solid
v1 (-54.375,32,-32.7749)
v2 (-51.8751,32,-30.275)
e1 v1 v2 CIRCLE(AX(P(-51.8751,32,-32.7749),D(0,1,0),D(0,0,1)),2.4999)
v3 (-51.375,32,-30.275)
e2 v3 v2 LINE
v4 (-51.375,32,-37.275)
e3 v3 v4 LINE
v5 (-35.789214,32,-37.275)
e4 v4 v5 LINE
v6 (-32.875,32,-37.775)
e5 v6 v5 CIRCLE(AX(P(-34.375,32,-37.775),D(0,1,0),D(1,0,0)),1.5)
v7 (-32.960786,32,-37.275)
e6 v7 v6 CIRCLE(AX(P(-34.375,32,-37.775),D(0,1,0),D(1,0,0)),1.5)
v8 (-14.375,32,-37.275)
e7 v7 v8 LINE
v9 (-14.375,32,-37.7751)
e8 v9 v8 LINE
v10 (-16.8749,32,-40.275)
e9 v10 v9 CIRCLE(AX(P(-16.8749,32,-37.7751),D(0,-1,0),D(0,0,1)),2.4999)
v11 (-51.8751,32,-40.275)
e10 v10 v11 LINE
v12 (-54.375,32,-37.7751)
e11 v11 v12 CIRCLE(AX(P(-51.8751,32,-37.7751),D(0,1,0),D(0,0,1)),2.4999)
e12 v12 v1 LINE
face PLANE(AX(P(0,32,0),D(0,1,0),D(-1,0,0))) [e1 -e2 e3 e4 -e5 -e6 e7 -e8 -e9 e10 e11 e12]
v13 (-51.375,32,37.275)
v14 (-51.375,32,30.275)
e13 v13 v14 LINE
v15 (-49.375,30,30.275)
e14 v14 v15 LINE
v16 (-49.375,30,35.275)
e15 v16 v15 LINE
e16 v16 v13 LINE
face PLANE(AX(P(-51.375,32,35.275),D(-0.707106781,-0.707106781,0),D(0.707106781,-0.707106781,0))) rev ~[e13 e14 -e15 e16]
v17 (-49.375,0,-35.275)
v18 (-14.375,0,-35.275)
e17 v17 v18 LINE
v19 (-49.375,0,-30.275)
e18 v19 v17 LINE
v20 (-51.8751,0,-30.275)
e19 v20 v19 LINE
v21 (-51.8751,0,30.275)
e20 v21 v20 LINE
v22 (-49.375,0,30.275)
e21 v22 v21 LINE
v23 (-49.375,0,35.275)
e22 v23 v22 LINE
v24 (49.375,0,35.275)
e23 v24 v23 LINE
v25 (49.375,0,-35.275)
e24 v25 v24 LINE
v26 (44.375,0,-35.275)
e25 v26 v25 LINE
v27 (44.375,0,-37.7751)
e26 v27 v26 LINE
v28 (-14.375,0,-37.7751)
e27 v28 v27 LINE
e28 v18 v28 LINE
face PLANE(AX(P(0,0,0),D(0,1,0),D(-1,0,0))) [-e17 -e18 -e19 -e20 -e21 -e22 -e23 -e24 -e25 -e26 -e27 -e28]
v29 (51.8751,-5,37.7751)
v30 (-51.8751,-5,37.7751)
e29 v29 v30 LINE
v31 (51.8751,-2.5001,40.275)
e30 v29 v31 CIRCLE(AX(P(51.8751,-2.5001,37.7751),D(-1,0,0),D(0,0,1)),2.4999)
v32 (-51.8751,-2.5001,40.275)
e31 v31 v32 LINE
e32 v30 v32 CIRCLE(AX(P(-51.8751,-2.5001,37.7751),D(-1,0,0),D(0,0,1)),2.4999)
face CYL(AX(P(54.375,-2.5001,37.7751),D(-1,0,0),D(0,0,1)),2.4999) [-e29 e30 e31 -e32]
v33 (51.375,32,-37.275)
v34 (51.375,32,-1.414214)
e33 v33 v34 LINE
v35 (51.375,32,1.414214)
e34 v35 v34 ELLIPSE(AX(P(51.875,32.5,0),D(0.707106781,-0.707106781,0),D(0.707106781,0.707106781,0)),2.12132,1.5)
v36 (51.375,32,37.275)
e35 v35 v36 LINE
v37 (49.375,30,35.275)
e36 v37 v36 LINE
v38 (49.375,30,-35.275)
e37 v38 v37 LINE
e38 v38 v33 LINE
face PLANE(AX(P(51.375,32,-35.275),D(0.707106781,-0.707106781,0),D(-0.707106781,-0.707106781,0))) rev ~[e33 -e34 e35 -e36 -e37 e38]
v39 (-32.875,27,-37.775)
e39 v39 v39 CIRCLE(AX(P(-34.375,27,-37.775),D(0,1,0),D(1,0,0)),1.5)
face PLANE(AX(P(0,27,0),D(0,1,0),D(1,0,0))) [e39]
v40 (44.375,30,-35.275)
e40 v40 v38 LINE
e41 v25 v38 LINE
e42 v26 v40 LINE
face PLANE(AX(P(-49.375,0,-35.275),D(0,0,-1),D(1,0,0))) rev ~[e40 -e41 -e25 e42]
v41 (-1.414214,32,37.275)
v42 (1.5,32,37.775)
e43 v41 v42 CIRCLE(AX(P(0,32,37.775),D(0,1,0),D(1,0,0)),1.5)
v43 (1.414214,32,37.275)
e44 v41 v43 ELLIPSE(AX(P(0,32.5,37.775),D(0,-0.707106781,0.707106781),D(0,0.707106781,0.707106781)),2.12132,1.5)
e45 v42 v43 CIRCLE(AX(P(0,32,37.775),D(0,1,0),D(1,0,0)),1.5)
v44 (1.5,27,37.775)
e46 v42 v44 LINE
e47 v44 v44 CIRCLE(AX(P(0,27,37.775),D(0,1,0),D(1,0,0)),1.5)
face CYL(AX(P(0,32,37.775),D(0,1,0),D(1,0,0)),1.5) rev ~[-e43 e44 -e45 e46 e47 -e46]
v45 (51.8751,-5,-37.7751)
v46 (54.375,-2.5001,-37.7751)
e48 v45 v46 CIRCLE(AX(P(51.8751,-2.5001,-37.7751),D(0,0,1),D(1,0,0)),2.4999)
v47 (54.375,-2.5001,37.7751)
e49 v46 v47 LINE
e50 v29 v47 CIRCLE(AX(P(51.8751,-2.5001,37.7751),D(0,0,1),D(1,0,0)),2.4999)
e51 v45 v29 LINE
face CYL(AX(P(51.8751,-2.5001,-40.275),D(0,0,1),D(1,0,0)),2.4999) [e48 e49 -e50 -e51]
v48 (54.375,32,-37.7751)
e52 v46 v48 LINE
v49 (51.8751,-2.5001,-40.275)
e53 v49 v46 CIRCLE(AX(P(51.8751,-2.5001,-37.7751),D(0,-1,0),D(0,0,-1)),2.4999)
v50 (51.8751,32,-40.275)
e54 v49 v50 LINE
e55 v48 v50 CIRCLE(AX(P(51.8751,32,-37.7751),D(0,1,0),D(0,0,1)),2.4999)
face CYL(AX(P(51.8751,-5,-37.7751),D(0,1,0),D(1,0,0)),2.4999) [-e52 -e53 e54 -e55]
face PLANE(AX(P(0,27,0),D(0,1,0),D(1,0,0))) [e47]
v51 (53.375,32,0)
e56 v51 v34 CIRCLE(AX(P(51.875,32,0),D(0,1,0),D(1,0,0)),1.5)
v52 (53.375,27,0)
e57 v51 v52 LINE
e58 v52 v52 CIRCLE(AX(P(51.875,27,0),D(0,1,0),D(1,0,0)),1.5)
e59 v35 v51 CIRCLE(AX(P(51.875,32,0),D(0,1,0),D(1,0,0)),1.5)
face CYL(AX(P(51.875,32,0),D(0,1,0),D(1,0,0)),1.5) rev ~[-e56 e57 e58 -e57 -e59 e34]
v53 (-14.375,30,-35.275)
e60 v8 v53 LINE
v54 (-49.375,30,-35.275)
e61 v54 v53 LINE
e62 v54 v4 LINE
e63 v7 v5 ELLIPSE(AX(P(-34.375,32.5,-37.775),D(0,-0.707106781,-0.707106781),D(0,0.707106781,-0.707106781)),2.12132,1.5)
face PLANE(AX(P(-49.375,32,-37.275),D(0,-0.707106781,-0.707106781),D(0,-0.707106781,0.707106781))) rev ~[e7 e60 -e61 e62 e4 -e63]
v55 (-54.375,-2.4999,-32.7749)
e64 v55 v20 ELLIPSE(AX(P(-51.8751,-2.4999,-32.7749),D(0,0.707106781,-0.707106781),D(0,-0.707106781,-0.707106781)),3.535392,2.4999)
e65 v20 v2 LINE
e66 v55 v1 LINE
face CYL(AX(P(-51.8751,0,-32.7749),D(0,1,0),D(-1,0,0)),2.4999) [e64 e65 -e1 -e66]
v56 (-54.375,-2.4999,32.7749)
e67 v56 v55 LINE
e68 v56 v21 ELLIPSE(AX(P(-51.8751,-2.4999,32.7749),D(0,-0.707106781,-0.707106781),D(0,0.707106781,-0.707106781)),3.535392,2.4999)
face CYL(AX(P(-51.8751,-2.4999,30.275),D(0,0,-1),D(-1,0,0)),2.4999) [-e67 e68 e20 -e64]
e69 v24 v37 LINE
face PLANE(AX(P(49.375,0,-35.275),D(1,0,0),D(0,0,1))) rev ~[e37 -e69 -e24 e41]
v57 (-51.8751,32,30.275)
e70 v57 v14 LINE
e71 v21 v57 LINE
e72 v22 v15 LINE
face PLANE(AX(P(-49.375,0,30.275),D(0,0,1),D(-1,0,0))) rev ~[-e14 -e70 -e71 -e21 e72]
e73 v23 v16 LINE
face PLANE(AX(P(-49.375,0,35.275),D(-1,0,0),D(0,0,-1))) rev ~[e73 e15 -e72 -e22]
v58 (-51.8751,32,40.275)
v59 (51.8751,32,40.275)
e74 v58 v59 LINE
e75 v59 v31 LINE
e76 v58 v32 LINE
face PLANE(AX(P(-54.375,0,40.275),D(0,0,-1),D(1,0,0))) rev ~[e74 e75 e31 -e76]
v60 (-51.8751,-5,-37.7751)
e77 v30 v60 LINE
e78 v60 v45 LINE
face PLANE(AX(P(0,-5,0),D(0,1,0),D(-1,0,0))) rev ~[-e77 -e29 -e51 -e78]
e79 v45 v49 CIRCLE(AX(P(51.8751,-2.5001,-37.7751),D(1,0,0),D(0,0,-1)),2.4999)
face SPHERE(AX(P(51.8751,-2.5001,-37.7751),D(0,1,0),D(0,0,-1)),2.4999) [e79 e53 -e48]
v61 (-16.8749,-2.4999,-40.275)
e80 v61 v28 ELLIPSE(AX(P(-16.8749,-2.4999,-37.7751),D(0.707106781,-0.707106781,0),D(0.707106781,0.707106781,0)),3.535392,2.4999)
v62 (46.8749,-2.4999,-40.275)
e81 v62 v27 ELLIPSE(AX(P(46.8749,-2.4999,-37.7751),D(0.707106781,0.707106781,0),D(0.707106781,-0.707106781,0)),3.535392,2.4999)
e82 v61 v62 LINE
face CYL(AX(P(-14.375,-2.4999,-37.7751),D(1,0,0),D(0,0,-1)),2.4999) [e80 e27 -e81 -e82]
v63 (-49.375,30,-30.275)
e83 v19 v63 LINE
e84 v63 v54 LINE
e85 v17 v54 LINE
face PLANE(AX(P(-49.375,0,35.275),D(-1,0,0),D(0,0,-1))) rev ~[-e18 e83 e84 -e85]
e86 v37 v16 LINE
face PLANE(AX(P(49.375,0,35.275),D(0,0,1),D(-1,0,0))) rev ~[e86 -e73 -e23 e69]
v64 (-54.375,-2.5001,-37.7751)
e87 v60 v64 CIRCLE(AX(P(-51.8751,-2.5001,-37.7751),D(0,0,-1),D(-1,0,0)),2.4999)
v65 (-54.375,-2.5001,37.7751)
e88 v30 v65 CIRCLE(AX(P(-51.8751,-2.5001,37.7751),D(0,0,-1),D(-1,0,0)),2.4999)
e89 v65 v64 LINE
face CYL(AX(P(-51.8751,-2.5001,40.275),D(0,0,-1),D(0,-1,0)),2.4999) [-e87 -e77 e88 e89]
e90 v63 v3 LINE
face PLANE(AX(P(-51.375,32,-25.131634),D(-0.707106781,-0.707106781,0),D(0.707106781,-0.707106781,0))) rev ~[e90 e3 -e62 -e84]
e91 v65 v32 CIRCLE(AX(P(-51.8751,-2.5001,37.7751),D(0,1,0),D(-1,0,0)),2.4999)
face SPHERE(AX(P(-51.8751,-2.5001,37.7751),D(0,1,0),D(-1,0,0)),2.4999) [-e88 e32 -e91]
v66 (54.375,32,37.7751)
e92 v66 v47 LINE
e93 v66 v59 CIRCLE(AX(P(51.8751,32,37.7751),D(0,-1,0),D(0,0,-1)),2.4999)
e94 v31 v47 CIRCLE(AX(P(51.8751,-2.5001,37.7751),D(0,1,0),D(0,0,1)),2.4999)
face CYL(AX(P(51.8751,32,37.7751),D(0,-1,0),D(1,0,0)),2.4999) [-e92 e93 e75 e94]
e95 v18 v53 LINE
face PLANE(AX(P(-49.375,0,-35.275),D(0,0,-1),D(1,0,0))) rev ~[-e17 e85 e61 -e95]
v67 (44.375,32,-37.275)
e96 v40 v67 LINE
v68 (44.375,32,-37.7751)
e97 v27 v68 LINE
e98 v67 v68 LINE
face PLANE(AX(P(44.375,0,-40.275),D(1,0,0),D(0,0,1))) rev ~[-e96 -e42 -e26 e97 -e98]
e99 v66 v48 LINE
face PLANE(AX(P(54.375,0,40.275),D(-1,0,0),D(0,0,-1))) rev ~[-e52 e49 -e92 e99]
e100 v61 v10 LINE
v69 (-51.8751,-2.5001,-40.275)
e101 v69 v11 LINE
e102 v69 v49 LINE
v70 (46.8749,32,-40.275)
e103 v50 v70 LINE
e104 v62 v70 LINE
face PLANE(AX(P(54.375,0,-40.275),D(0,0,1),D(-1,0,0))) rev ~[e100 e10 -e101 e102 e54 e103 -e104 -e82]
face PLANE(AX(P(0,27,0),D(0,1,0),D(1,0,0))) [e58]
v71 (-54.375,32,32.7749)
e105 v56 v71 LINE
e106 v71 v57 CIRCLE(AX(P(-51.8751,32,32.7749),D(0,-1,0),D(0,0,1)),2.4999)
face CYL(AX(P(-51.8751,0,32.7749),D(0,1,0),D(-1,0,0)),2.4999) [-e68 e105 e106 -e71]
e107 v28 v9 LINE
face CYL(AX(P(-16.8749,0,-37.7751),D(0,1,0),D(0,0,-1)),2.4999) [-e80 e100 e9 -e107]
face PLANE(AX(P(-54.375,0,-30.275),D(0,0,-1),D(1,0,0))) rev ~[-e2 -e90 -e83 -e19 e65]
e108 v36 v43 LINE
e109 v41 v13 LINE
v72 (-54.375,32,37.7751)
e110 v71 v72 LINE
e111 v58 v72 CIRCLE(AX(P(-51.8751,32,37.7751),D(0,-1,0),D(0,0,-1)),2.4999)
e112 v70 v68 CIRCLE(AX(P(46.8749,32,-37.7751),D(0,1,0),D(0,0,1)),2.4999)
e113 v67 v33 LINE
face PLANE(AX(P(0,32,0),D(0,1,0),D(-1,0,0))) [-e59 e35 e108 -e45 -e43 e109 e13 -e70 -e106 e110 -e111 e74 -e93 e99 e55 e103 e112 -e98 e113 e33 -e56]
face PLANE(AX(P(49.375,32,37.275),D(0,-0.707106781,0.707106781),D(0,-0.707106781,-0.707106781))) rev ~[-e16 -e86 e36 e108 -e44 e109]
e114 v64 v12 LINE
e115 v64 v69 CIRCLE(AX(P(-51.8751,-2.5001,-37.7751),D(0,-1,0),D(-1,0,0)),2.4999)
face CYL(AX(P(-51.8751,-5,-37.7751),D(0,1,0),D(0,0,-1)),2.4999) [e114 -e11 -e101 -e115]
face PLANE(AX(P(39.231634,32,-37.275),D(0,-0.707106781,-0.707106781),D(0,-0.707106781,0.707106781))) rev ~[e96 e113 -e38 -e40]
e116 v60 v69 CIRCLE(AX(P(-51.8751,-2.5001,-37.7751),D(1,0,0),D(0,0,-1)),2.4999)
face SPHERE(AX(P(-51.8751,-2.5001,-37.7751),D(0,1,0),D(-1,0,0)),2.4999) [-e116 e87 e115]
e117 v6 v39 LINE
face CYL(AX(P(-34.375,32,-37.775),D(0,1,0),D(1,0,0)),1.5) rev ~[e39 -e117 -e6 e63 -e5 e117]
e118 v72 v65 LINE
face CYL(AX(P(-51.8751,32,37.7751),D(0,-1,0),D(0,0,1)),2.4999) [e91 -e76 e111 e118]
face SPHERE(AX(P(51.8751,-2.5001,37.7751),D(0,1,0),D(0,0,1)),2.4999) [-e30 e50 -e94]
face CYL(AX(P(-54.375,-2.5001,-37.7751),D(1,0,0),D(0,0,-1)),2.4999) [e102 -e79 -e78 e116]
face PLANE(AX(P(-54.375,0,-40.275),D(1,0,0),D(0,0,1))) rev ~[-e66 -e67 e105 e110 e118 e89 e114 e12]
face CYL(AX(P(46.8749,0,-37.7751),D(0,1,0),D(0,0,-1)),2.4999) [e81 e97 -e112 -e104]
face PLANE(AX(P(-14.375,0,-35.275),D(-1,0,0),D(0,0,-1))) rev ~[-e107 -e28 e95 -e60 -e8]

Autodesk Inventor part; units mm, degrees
ref_plane "YZ Plane" through (0, 0, 0) normal (1, 0, 0) x (0, 1, 0)
ref_plane "XZ Plane" through (0, 0, 0) normal (0, 1, 0) x (-1, 0, 0)
ref_plane "XY Plane" through (0, 0, 0) normal (0, 0, 1) x (1, 0, 0)
sketch "스케치2" plane through (0, 0, 0) normal (0, 1, 0) x (-1, 0, 0)
  line L0 (-49.375, 35.275) -> (49.375, 35.275)
  line L1 (49.375, 35.275) -> (49.375, -35.275)
  line L2 (49.375, -35.275) -> (-49.375, -35.275)
  line L3 (-49.375, -35.275) -> (-49.375, 35.275)
  line L4 (-49.375, 35.275) -> (49.375, -35.275) construction
  line L5 (49.375, 35.275) -> (-49.375, -35.275) construction
  line L6 (-54.375, -40.275) -> (54.375, -40.275)
  line L7 (54.375, -40.275) -> (54.375, 40.275)
  line L8 (54.375, 40.275) -> (-54.375, 40.275)
  line L9 (-54.375, 40.275) -> (-54.375, -40.275)
  point P0 (0, 0)
  dimension "d0" = 98.75
  dimension "d1" = 70.55
  dimension "d2" = 5
extrude "돌출1" add sketch "스케치2" along normal blind 32
sketch "스케치3" plane through (0, 0, 0) normal (0, 1, 0) x (-1, 0, 0)
  line L0 (-54.375, 40.275) -> (-54.375, -40.275) construction
  line L1 (54.375, -40.275) -> (-54.375, -40.275)
  line L2 (-54.375, -40.275) -> (-54.375, 40.275)
  line L3 (-54.375, 40.275) -> (54.375, 40.275)
  line L4 (54.375, 40.275) -> (54.375, -40.275)
  line L5 (54.375, -40.275) -> (-54.375, 40.275) construction
  line L6 (-54.375, -40.275) -> (54.375, 40.275) construction
  point P0 (0, 0)
extrude "돌출2" add sketch "스케치3" against normal blind 5
sketch "스케치4" plane through (0, 0, 0) normal (0, 1, 0) x (-1, 0, 0)
  line L0 (49.375, 35.275) -> (49.375, -35.275) construction
  line L1 (54.375, -40.275) -> (54.375, 40.275) construction
  line L2 (49.375, 30.275) -> (54.375, 30.275)
  line L3 (54.375, 30.275) -> (54.375, -30.275)
  line L4 (54.375, -30.275) -> (49.375, -30.275)
  line L5 (49.375, -30.275) -> (49.375, 30.275)
  line L6 (-49.375, 35.275) -> (49.375, 35.275) construction
  line L7 (49.375, -35.275) -> (-49.375, -35.275) construction
  line L8 (54.375, -40.275) -> (-54.375, -40.275) construction
  line L9 (-44.375, -35.275) -> (14.375, -35.275)
  line L10 (14.375, -35.275) -> (14.375, -40.275)
  line L11 (14.375, -40.275) -> (-44.375, -40.275)
  line L12 (-44.375, -40.275) -> (-44.375, -35.275)
  line L13 (-49.375, -35.275) -> (-49.375, 35.275) construction
  point P0 (0, 0)
  dimension "d7" = 5
  dimension "d8" = 5
  dimension "d11" = 5
  dimension "d12" = 35
extrude "돌출3" cut sketch "스케치4" along normal through all
sketch "스케치5" plane through (0, 32, 0) normal (0, 1, 0) x (1, 0, 0)
  line L0 (49.375, 35.275) -> (49.375, -35.275) construction
  line L1 (49.375, -35.275) -> (-49.375, -35.275) construction
  circle A0 centre (0, -37.775) radius 1.5
  circle A1 centre (51.875, 0) radius 1.5
  circle A2 centre (-34.375, 37.775) radius 1.5
  line L2 (-49.375, 35.275) -> (-14.375, 35.275) construction
  line L3 (-54.375, 40.275) -> (-54.375, 30.275) construction
  point P0 (0, 0)
  dimension "d17" = 3
  dimension "d18" = 2.5
  dimension "d19" = 3
  dimension "d20" = 2.5
  dimension "d21" = 3
  dimension "d22" = 2.5
  dimension "d23" = 20
extrude "돌출4" cut sketch "스케치5" against normal blind 5
fillet "모깎기1" radius 2.5 14 edges at (-54.375, 13.5, 40.275) (54.375, 13.5, 40.275) (54.375, 13.5, -40.275) (-54.375, 13.5, -40.275) (-54.375, -5, 0) (0, -5, -40.275) (0, -5, 40.275) (54.375, -5, 0) (-14.375, 16, -40.275) (15, 0, -40.275) (44.375, 16, -40.275) (-54.375, 16, 30.275) (-54.375, 0, 0) (-54.375, 16, -30.275)
chamfer "모따기1" distance 2 angle 45 6 edges at (-31.875, 32, -35.275) (-49.375, 32, -32.775) (-49.375, 32, 32.775) (0, 32, 35.275) (49.375, 32, 0) (46.875, 32, -35.275)
properties part number "housing_bottom"
